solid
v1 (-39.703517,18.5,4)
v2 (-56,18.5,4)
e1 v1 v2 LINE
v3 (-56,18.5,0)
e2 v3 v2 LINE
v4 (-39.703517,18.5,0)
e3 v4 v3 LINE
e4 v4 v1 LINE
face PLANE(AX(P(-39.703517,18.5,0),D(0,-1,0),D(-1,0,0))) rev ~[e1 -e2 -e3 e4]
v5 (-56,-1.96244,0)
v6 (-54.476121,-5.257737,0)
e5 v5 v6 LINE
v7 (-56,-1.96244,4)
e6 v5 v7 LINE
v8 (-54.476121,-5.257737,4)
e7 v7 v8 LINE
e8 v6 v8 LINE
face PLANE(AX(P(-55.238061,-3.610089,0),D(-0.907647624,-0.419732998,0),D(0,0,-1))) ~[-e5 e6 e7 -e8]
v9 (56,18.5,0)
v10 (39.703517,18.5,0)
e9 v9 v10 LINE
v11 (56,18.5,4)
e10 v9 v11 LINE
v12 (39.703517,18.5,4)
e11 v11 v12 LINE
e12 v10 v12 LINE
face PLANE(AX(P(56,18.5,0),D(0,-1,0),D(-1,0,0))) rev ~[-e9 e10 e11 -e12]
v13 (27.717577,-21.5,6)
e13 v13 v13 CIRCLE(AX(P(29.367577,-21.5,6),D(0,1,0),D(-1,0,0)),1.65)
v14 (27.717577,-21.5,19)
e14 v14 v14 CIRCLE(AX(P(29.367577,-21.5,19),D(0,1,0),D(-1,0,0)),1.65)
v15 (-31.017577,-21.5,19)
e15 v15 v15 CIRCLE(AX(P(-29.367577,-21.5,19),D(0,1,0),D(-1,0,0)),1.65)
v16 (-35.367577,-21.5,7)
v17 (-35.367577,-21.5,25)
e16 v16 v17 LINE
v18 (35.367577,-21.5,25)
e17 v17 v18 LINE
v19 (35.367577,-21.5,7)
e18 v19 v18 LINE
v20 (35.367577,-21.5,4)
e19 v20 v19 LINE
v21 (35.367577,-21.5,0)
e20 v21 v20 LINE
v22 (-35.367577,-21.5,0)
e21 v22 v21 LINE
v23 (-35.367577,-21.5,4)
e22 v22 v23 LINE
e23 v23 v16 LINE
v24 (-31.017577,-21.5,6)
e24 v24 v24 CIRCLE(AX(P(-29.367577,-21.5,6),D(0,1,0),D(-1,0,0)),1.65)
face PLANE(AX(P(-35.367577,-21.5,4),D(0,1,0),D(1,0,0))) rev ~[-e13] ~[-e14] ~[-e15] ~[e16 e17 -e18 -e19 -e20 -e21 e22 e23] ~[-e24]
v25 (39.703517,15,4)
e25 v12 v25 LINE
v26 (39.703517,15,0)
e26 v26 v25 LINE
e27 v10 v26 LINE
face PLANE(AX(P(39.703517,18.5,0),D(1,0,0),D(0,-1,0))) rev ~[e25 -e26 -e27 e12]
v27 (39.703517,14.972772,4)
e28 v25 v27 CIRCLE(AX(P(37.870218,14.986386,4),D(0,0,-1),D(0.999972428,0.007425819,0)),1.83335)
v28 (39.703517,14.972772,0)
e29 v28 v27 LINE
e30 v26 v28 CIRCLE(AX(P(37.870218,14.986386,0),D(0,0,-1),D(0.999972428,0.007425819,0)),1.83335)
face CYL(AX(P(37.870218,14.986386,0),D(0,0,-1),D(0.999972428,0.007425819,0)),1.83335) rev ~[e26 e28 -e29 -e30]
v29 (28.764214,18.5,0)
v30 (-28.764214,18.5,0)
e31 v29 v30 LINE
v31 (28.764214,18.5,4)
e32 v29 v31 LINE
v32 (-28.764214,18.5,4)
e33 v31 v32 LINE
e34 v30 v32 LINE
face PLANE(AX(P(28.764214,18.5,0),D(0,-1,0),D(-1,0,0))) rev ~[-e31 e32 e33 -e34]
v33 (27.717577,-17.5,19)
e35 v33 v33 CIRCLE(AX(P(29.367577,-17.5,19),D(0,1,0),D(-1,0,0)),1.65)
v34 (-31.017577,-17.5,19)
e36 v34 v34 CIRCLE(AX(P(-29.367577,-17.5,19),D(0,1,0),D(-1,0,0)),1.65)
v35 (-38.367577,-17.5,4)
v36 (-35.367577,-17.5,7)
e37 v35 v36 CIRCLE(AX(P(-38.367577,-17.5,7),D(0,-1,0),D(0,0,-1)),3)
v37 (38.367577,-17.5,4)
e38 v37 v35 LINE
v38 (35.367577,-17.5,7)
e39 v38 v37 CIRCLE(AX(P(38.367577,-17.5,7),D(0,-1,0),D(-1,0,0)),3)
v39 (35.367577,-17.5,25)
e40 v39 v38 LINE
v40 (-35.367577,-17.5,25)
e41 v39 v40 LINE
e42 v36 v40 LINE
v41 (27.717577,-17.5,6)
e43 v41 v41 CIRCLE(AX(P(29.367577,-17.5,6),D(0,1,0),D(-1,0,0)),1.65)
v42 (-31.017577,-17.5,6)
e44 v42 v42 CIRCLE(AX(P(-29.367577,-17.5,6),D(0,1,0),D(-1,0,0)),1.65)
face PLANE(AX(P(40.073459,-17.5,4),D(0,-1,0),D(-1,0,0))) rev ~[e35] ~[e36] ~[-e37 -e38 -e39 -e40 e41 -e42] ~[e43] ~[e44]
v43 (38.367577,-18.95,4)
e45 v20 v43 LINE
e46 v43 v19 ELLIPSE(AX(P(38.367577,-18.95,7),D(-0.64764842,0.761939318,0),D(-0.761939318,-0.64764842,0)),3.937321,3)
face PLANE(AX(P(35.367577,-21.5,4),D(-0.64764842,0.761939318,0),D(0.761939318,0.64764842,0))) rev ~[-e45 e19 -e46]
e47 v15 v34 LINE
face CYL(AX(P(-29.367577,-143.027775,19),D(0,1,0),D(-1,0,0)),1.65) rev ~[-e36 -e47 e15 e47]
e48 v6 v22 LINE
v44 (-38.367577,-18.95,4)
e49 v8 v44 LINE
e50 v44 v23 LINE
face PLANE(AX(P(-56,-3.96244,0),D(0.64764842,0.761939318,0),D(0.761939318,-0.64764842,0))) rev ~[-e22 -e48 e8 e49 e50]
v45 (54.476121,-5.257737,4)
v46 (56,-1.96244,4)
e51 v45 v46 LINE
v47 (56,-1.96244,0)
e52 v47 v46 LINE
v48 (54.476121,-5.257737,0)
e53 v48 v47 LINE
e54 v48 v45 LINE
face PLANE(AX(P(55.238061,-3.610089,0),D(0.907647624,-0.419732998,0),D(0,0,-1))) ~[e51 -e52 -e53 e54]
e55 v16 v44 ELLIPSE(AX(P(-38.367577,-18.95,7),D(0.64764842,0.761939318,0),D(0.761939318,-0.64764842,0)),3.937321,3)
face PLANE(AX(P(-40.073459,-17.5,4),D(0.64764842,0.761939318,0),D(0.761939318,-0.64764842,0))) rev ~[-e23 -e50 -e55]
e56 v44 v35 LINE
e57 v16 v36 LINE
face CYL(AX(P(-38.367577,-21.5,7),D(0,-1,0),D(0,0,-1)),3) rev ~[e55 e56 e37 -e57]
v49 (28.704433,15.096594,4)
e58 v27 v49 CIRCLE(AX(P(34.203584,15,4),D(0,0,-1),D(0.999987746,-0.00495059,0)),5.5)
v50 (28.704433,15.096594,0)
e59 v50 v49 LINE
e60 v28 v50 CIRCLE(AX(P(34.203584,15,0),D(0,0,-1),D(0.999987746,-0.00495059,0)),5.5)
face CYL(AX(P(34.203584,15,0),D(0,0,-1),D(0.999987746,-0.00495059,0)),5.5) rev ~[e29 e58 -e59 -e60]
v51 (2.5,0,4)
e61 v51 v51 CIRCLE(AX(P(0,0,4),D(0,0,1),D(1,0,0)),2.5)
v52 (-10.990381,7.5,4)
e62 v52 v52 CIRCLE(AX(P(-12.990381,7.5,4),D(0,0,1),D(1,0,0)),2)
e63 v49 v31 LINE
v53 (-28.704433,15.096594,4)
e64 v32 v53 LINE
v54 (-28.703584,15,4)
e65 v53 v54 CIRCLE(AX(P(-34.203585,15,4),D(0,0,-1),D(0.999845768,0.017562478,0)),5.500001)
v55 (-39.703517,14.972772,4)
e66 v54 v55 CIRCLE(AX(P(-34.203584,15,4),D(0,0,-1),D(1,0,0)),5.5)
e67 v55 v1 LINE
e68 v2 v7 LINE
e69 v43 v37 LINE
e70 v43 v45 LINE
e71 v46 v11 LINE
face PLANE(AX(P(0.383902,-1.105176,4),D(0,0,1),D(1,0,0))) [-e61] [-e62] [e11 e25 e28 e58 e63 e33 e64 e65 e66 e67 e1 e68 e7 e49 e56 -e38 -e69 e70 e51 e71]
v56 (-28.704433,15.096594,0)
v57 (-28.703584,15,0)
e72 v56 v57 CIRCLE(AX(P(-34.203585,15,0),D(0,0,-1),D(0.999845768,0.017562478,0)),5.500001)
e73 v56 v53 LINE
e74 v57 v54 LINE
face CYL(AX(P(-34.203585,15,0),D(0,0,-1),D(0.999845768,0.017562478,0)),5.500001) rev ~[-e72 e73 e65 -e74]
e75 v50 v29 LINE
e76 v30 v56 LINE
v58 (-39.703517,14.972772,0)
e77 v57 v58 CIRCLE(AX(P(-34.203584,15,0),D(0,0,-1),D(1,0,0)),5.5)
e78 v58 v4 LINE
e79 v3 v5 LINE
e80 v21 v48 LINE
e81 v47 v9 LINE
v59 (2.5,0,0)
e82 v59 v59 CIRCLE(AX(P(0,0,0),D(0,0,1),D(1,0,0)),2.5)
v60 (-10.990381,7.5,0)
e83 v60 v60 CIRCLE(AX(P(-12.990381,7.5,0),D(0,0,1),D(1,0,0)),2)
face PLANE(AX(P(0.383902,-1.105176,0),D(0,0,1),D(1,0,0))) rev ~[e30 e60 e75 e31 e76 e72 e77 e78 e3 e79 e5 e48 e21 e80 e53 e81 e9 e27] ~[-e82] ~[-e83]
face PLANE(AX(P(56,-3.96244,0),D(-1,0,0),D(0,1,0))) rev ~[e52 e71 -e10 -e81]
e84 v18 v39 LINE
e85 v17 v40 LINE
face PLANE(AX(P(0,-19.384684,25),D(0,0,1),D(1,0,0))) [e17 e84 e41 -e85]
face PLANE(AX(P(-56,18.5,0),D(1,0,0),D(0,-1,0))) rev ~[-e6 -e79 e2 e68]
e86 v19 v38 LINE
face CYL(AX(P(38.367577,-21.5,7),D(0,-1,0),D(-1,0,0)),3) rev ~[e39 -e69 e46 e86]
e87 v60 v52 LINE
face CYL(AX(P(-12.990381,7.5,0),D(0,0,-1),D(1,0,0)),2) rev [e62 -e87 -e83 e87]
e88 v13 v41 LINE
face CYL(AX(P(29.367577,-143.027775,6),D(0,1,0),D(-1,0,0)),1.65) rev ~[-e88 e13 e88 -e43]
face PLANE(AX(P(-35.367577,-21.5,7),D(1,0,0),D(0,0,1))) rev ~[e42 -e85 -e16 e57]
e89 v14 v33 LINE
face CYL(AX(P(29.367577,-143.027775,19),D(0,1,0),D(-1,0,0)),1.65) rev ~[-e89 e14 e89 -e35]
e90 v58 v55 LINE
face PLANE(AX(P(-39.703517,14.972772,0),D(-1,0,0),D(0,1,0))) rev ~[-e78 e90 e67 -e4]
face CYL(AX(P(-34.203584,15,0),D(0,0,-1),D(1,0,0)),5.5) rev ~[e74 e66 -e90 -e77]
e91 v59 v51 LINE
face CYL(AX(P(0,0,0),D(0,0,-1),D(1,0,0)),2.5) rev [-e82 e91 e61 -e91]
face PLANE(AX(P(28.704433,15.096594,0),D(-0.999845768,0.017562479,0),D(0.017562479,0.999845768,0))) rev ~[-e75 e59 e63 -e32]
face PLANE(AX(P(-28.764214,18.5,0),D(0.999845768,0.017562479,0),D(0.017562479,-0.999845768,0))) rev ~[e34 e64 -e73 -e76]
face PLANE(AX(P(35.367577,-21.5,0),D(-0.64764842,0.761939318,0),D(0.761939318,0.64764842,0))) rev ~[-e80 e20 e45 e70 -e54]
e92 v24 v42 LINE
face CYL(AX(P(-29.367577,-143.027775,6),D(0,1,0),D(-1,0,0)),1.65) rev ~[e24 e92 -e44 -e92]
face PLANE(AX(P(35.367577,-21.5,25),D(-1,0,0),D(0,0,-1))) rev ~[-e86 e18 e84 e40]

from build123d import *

# Parameters (mm, degrees)
F0_R     = 2.5
F0_R_2   = 2
F1_DEPTH = 4
F3_DEPTH = 21
F5_DEPTH = 25
F6_D     = 3.3
F7_SIZE  = 2


# Not quite as in the source:
# - ends of sketch curves that miss each other by under 0.0002 mm in the source are joined


with BuildPart() as f1:
    # F0 (on Top) → F1 (new body)
    with BuildSketch(Plane.XY):
        with BuildLine():
            ThreePointArc((0, 18.5), (13.081475452, 13.081475452), (18.5, 0))
            ThreePointArc((18.5, 0), (-1.1345020789, -18.4651808828), (-18.3608545982, 2.2647336323))
            ThreePointArc((-18.3608545982, 2.2647336323), (-20.315445832, 5.8895882396), (-20.061448931, 9.9999998237))
            ThreePointArc((-20.061448931, 9.9999998237), (-38.4593739655, 0.6163893281), (-48.7895366382, 18.5))
            Line((-48.7895366382, 18.5), (-55, 18.5))
            Line((-55, 18.5), (-55, -3.5))
            Line((-55, -3.5), (-35, -20.5))
            Line((-35, -20.5), (0, -20.5))
            Line((0, -20.5), (35, -20.5))
            Line((35, -20.5), (55, -3.5))
            Line((55, -3.5), (55, 18.5))
            Line((55, 18.5), (39.703517094, 18.5))
            Line((39.703517094, 18.5), (39.703517094, 15))
            ThreePointArc((39.703517094, 15), (39.7035676427, 14.9863858353), (39.703517094, 14.9727717541))
            ThreePointArc((39.703517094, 14.9727717541), (34.1416723213, 9.5003484762), (28.7044327696, 15.096593634))
            Line((28.7044327696, 15.096593634), (28.7642142424, 18.5))
            Line((28.7642142424, 18.5), (0, 18.5))
        make_face()
        with BuildLine():
            ThreePointArc((-18.3608545982, 2.2647336323), (-1.1345020789, -18.4651808828), (18.5, 0))
            ThreePointArc((18.5, 0), (13.081475452, 13.081475452), (0, 18.5))
            ThreePointArc((0, 18.5), (-5.8749853417, 17.542364357), (-11.1417441574, 14.7685997011))
            ThreePointArc((-11.1417441574, 14.7685997011), (-7.0694530575, 12.1035433774), (-5.4903810568, 7.5))
            ThreePointArc((-5.4903810568, 7.5), (-5.7459373553, 5.5588571779), (-6.4951905116, 3.750000029))
            ThreePointArc((-6.4951905116, 3.750000029), (-12.0588494406, 0.0580749232), (-18.3608545982, 2.2647336323))
        make_face()
        with BuildLine():
            ThreePointArc((7.5, 0), (-1.9411428544, -7.2444436928), (-6.4951905116, 3.750000029))
            ThreePointArc((-6.4951905116, 3.750000029), (1.9411428544, 7.2444436928), (7.5, 0))
        make_face(mode=Mode.SUBTRACT)
        with BuildLine():
            ThreePointArc((7.5, 0), (1.9411428544, 7.2444436928), (-6.4951905116, 3.750000029))
            ThreePointArc((-6.4951905116, 3.750000029), (-1.9411428544, -7.2444436928), (7.5, 0))
        make_face()
        Circle(F0_R, mode=Mode.SUBTRACT)
        with BuildLine():
            ThreePointArc((-11.1417441574, 14.7685997011), (-16.02146997, 9.25), (-18.3608545982, 2.2647336323))
            ThreePointArc((-18.3608545982, 2.2647336323), (-12.0588494406, 0.0580749232), (-6.4951905116, 3.750000029))
            ThreePointArc((-6.4951905116, 3.750000029), (-5.7459373553, 5.5588571779), (-5.4903810568, 7.5))
            ThreePointArc((-5.4903810568, 7.5), (-7.0694530575, 12.1035433774), (-11.1417441574, 14.7685997011))
        make_face()
        with Locations((-12.9903810568, 7.5)):
            Circle(F0_R_2, mode=Mode.SUBTRACT)
        with BuildLine():
            ThreePointArc((-20.061448931, 9.9999998237), (-20.315445832, 5.8895882396), (-18.3608545982, 2.2647336323))
            ThreePointArc((-18.3608545982, 2.2647336323), (-16.02146997, 9.25), (-11.1417441574, 14.7685997011))
            ThreePointArc((-11.1417441574, 14.7685997011), (-16.5263862207, 14.1141263581), (-20.061448931, 9.9999998237))
        make_face()
        with BuildLine():
            ThreePointArc((-11.1417441574, 14.7685997011), (-5.8749853417, 17.542364357), (0, 18.5))
            Line((0, 18.5), (-19.6176323465, 18.5))
            ThreePointArc((-19.6176323465, 18.5), (-19.3074560996, 16.7622028562), (-19.2035844924, 15))
            ThreePointArc((-19.2035844924, 15), (-19.4196061134, 12.463470227), (-20.061448931, 9.9999998237))
            ThreePointArc((-20.061448931, 9.9999998237), (-16.5263862207, 14.1141263581), (-11.1417441574, 14.7685997011))
        make_face()
        with BuildLine():
            ThreePointArc((-19.2035844924, 15), (-19.3074560996, 16.7622028562), (-19.6176323465, 18.5))
            Line((-19.6176323465, 18.5), (-28.7642142424, 18.5))
            Line((-28.7642142424, 18.5), (-28.7044327696, 15.096593634))
            ThreePointArc((-28.7044327696, 15.096593634), (-28.7037965658, 15.0482986794), (-28.7035844924, 15))
            ThreePointArc((-28.7035844924, 15), (-34.1899703277, 9.5000168496), (-39.703517094, 14.9727717541))
            Line((-39.703517094, 14.9727717541), (-39.703517094, 18.5))
            Line((-39.703517094, 18.5), (-48.7895366382, 18.5))
            ThreePointArc((-48.7895366382, 18.5), (-38.4593739655, 0.6163893281), (-20.061448931, 9.9999998237))
            ThreePointArc((-20.061448931, 9.9999998237), (-19.4196061134, 12.463470227), (-19.2035844924, 15))
        make_face()
        Polygon((-55, -3.5), (-55, 18.5), (-56, 18.5), (-56, -3.9624404748), (-35.3675770292, -21.5), (0, -21.5), (35.3675770292, -21.5), (56, -3.9624404748), (56, 18.5), (55, 18.5), (55, -3.5), (35, -20.5), (0, -20.5), (-35, -20.5), align=None)
    extrude(amount=F1_DEPTH)

    # F2 (on face) → F3 (join)
    with BuildSketch(Plane.XY.offset(4)):
        Polygon((40.0734593822, -17.5), (-40.0734593822, -17.5), (-35.3675770292, -21.5), (35.3675770292, -21.5), align=None)
    extrude(amount=F3_DEPTH)

    # F4 (on face) → F5 (cut)
    with BuildSketch(Plane.XZ.offset(21.5)):
        with BuildLine():
            Line((-35.3675770292, 25), (-40.0734593822, 25))
            Line((-40.0734593822, 25), (-40.0734593822, 4))
            Line((-40.0734593822, 4), (-38.3675770292, 4))
            ThreePointArc((-38.3675770292, 4), (-36.2462566857, 4.8786796564), (-35.3675770292, 7))
            Line((-35.3675770292, 7), (-35.3675770292, 25))
        make_face()
        with BuildLine():
            Line((40.0734593822, 25), (35.3675770292, 25))
            Line((35.3675770292, 25), (35.3675770292, 7))
            ThreePointArc((35.3675770292, 7), (36.2462566857, 4.8786796564), (38.3675770292, 4))
            Line((38.3675770292, 4), (40.0734593822, 4))
            Line((40.0734593822, 4), (40.0734593822, 25))
        make_face()
    extrude(amount=-F5_DEPTH, mode=Mode.SUBTRACT)

    # F6 (through all)
    with Locations(Plane.XZ.offset(21.5)):
        with Locations((-29.3675770292, 19), (-29.3675770292, 6), (29.3675770292, 6), (29.3675770292, 19)):
            Hole(F6_D / 2)

    # F7
    f7_edges = [f1.edges().sort_by_distance(p)[0] for p in [
        (-56, -3.96244, 2),
        (56, -3.96244, 2),
    ]]
    chamfer(f7_edges, length=F7_SIZE)


solid = f1.part
